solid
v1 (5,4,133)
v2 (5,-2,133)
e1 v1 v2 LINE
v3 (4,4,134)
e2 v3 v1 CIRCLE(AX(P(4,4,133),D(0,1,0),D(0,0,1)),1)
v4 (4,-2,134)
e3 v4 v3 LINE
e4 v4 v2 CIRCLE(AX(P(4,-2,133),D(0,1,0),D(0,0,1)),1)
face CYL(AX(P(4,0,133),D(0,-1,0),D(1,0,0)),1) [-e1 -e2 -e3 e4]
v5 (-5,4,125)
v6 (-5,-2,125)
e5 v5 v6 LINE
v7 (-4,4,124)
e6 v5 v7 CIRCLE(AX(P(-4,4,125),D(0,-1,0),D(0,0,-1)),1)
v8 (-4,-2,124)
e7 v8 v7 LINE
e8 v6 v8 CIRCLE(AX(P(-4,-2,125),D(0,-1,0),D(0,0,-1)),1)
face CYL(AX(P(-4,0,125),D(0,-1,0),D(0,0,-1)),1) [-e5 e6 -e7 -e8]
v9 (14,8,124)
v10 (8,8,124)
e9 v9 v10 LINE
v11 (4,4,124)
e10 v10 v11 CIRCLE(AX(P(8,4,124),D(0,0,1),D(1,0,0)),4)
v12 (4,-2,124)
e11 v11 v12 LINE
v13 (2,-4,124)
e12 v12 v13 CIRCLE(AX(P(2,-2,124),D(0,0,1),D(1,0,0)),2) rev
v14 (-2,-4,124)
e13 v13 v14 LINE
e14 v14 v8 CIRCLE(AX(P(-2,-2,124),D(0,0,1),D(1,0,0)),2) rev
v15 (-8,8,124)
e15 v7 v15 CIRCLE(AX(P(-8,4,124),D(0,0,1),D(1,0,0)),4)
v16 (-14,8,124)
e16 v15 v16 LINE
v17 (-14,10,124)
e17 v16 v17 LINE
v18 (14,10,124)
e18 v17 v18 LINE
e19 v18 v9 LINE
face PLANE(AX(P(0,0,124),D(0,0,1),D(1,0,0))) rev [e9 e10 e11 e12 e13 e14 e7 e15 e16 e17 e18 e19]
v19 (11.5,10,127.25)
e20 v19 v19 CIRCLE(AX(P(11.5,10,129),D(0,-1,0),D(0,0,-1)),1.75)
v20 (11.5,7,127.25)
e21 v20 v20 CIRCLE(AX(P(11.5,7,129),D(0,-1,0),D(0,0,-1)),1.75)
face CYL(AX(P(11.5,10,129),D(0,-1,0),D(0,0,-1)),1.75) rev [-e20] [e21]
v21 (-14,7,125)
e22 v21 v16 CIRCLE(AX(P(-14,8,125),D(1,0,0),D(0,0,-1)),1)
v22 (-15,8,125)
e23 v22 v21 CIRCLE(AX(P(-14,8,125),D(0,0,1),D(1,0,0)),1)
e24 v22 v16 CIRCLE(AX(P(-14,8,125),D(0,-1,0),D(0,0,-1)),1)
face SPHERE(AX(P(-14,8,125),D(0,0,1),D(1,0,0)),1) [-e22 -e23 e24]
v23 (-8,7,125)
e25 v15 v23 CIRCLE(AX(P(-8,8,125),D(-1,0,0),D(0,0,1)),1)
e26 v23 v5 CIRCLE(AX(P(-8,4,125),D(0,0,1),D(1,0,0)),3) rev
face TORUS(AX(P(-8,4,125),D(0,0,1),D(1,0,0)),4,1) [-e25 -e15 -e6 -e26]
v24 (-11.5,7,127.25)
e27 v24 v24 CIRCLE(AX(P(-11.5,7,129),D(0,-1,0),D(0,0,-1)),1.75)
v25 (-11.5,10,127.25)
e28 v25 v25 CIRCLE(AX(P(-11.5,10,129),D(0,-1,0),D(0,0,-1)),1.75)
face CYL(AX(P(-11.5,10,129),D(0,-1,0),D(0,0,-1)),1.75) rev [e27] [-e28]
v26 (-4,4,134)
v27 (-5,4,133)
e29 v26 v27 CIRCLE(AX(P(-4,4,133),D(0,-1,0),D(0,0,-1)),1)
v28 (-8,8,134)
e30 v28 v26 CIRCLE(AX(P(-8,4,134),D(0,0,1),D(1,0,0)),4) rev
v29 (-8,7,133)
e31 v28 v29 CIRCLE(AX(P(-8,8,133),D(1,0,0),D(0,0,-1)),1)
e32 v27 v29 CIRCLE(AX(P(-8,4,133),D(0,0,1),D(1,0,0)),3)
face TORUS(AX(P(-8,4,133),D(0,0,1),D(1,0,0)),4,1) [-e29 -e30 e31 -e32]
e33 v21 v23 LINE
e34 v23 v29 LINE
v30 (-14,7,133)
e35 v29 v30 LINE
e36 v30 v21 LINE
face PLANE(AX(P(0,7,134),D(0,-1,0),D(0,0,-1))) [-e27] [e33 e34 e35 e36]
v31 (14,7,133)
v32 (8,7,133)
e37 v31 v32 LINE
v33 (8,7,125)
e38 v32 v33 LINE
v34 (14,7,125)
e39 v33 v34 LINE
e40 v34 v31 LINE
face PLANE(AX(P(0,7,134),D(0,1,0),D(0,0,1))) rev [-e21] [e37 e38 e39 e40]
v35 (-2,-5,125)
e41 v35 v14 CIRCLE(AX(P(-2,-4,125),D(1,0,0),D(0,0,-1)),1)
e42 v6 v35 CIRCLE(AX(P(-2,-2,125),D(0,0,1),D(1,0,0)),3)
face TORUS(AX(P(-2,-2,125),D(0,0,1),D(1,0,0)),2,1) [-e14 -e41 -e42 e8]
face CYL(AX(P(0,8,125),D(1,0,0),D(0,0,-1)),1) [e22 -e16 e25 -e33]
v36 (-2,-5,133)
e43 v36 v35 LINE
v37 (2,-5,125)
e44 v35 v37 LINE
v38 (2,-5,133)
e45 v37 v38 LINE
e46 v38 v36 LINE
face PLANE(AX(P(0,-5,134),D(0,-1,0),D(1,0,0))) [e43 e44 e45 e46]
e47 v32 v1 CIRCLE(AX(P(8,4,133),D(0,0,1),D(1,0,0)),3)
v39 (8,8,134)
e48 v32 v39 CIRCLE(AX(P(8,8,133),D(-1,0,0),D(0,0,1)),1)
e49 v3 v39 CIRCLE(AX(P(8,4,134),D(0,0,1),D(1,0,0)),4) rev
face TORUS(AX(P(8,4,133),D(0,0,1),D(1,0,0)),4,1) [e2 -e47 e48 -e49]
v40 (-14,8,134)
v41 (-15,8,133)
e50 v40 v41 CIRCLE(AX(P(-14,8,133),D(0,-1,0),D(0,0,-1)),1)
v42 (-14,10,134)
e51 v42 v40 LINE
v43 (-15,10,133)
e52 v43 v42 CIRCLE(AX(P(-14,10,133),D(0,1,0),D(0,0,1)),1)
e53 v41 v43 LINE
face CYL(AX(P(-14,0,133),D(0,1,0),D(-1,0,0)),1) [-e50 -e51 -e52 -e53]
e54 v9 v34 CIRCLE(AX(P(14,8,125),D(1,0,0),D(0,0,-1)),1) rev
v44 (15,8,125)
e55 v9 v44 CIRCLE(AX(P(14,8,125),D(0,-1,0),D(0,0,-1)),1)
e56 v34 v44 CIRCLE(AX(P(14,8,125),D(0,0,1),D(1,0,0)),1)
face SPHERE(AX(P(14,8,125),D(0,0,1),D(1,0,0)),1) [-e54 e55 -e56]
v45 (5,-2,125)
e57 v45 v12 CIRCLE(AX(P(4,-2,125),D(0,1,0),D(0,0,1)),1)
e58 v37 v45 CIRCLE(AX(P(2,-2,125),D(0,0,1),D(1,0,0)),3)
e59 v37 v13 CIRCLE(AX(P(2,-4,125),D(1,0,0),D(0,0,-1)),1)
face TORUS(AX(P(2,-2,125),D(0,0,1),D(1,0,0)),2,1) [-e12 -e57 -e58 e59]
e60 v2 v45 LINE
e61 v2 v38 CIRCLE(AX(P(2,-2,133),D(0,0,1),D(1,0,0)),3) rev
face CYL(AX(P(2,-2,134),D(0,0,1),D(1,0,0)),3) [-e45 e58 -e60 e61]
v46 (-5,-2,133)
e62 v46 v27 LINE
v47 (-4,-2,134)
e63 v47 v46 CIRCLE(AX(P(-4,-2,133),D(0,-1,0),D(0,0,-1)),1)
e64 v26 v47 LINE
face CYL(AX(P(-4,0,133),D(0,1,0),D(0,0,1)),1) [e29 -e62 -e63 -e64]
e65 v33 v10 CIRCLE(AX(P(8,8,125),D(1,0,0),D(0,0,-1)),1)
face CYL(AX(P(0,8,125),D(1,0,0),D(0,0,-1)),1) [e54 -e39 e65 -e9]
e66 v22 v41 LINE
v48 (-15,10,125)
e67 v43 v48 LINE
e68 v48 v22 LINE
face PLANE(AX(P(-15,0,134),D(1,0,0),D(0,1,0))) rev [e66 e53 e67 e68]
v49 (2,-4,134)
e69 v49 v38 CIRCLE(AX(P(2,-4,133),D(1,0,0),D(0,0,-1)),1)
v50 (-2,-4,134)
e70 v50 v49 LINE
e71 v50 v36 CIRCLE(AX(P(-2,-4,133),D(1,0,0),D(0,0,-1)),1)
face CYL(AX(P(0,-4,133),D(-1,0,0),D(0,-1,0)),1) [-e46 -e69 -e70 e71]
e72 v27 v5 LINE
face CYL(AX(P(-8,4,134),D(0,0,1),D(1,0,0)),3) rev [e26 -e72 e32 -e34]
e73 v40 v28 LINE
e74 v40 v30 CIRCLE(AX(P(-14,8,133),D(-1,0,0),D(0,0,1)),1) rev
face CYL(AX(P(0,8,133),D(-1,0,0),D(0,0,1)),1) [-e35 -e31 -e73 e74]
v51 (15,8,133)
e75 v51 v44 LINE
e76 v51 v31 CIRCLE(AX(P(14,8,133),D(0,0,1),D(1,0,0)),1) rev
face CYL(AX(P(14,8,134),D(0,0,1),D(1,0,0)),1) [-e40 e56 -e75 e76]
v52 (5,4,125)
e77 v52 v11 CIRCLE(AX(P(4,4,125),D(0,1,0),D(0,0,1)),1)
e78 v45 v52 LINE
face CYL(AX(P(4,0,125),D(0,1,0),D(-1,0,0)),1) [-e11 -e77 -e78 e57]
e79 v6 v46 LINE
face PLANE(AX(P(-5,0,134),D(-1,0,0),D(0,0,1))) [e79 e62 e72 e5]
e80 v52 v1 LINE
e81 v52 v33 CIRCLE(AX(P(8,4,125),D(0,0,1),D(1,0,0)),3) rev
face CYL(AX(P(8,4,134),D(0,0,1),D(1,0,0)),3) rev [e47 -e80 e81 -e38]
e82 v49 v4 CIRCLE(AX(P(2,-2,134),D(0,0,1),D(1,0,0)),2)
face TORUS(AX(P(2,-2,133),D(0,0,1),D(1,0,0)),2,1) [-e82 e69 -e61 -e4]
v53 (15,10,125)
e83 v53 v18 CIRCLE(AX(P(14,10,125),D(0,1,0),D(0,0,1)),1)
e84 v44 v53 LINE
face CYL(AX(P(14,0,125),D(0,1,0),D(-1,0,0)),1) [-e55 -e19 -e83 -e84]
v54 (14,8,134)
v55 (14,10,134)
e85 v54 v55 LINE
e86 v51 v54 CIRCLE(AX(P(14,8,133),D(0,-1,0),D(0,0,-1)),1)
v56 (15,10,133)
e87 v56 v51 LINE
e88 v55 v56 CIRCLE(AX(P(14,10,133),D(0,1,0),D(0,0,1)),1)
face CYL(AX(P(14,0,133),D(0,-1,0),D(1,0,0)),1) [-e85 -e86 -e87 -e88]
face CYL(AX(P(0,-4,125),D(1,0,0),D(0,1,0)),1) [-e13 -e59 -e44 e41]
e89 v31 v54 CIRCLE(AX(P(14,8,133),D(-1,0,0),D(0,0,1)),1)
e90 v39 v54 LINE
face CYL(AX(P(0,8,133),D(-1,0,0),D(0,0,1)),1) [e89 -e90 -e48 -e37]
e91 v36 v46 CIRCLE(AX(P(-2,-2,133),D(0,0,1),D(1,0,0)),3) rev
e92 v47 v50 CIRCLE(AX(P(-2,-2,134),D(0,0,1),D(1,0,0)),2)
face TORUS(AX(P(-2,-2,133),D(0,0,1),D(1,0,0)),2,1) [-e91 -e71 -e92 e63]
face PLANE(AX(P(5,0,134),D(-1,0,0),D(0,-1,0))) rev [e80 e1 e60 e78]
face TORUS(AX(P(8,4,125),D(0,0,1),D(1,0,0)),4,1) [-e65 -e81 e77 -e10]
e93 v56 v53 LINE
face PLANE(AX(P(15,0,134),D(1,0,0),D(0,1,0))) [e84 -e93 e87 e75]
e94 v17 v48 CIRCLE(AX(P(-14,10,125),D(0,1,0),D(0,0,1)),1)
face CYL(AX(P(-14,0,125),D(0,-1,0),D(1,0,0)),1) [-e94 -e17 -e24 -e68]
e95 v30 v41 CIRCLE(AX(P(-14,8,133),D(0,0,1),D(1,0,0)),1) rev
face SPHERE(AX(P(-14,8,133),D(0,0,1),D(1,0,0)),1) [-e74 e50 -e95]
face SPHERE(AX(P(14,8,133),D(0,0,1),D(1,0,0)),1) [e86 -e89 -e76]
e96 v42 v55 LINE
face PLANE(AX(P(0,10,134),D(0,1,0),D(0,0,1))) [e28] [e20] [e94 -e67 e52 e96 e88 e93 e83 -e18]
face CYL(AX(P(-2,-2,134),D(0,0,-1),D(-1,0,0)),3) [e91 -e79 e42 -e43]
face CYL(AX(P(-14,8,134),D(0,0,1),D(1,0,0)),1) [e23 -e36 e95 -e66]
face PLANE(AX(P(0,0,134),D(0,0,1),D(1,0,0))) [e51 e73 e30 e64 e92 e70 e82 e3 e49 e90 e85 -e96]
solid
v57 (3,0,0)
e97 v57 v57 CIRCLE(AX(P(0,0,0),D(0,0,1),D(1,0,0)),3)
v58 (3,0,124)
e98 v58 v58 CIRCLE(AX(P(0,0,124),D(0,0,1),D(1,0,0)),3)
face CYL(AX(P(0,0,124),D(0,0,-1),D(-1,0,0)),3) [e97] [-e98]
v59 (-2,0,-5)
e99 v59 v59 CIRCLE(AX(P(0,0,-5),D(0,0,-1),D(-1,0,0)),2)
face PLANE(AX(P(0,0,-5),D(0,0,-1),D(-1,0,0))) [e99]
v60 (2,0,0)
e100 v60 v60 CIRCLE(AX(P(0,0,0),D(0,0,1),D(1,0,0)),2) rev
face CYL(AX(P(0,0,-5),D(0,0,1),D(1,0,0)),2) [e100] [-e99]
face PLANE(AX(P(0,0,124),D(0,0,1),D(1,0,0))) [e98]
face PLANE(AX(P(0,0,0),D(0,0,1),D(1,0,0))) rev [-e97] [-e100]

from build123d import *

# Parameters (mm, degrees)
SKETCH_1_R          = 3
EXTRUDE_1_DEPTH     = 124
SKETCH_2_R          = 2
EXTRUDE_2_DEPTH     = 5
SKETCH_4_W          = 10
SKETCH_4_H          = 3
EXTRUDE_4_DEPTH     = 10
FILLET_6_R          = 3
FILLET_7_R          = 1
SKETCH_5_R          = 1.75
CUT_EXTRUDE_1_DEPTH = 136.369863806
FILLET_8_R          = 1


with BuildPart() as part:
    # ｽｹｯﾁ1 → ﾎﾞｽ - 押し出し1 (new body)
    with BuildSketch(Plane.XY):
        Circle(SKETCH_1_R)
    extrude(amount=EXTRUDE_1_DEPTH)

    # ｽｹｯﾁ2 → ﾎﾞｽ - 押し出し2 (add)
    with BuildSketch(Plane(origin=(0, 0, 0), x_dir=(-1, 0, 0), z_dir=(0, 0, -1))):
        with Locations(Location((0, 0, 0), (0, 0, 180))):
            Circle(SKETCH_2_R)
    extrude(amount=EXTRUDE_2_DEPTH)


with BuildPart() as body_2:
    # ｽｹｯﾁ4 → ﾎﾞｽ - 押し出し4 (new body)
    with BuildSketch(Plane.XY.offset(124)):
        with Locations((10, 8.5)):
            Rectangle(SKETCH_4_W, SKETCH_4_H)
        with BuildLine():
            Line((5, 10), (0, 10))
            Line((0, 10), (0, 3))
            ThreePointArc((0, 3), (2.121320344, 2.121320344), (3, 0))
            ThreePointArc((3, 0), (2.121320344, -2.121320344), (0, -3))
            Line((0, -3), (0, -5))
            Line((0, -5), (5, -5))
            Line((5, -5), (5, 7))
            Line((5, 7), (5, 10))
        make_face()
        with BuildLine():
            Line((0, 3), (0, 10))
            Line((0, 10), (-5, 10))
            Line((-5, 10), (-5, 7))
            Line((-5, 7), (-5, -5))
            Line((-5, -5), (0, -5))
            Line((0, -5), (0, -3))
            ThreePointArc((0, -3), (-3, 0), (0, 3))
        make_face()
        with Locations((-10, 8.5)):
            Rectangle(SKETCH_4_W, SKETCH_4_H)
        with BuildLine():
            ThreePointArc((3, 0), (2.121320344, 2.121320344), (0, 3))
            Line((0, 3), (0, -3))
            ThreePointArc((0, -3), (2.121320344, -2.121320344), (3, 0))
        make_face()
        with BuildLine():
            Line((0, -3), (0, 3))
            ThreePointArc((0, 3), (-3, 0), (0, -3))
        make_face()
    extrude(amount=EXTRUDE_4_DEPTH)

    # ﾌｨﾚｯﾄ6
    fillet_6_edges = [body_2.edges().sort_by_distance(p)[0] for p in [
        (5, 7, 129),
        (5, -5, 129),
        (-5, -5, 129),
        (-5, 7, 129),
    ]]
    fillet(fillet_6_edges, radius=FILLET_6_R)

    # ﾌｨﾚｯﾄ7
    fillet_7_edges = [body_2.edges().sort_by_distance(p)[0] for p in [
        (15, 7, 129),
        (-15, 7, 129),
        (11.5, 7, 124),
        (11.5, 7, 134),
        (5, 1, 124),
        (5, 1, 134),
        (-5, 1, 124),
        (-5, 1, 134),
        (-11.5, 7, 124),
        (-11.5, 7, 134),
        (0, -5, 124),
        (-4.121320344, -4.121320344, 124),
        (4.121320344, -4.121320344, 124),
        (0, -5, 134),
        (-4.121320344, -4.121320344, 134),
        (4.121320344, -4.121320344, 134),
        (5.878679656, 6.121320344, 124),
        (5.878679656, 6.121320344, 134),
        (-5.878679656, 6.121320344, 124),
        (-5.878679656, 6.121320344, 134),
    ]]
    fillet(fillet_7_edges, radius=FILLET_7_R)

    # ｽｹｯﾁ5 → ｶｯﾄ - 押し出し1 (cut, through all)
    with BuildSketch(Plane(origin=(0, 7, 0), x_dir=(-1, 0, 0), z_dir=(0, -1, 0))):
        with Locations(Location((-11.5, -129, 0), (0, 0, 90))):
            Circle(SKETCH_5_R)
        with Locations(Location((11.5, -129, 0), (0, 0, 90))):
            Circle(SKETCH_5_R)
    extrude(amount=-CUT_EXTRUDE_1_DEPTH, mode=Mode.SUBTRACT)

    # ﾌｨﾚｯﾄ8
    # the kernel refuses this fillet: 1 mm, written as the material it takes off along each edge
    with BuildSketch(Plane(origin=(14, 8, 125), x_dir=(1, 0, 0), z_dir=(0, 0, -1))) as fillet_8_piece_1_section:
        Polygon((0, 0), (FILLET_8_R, 0), (FILLET_8_R, FILLET_8_R), (0, FILLET_8_R), align=None)
    fillet_8_piece_1 = extrude(amount=FILLET_8_R, mode=Mode.PRIVATE)
    fillet_8_piece_1 = fillet_8_piece_1 - Plane(origin=(14, 8, 125), x_dir=(-0.7071067811865472, 0.7071067811865477, 0), z_dir=(0, 0, -1)) * Sphere(FILLET_8_R, mode=Mode.PRIVATE)
    add(fillet_8_piece_1, mode=Mode.SUBTRACT)
    with BuildSketch(Plane(origin=(14, 8, 133), x_dir=(1, 0, 0), z_dir=(0, 0, 1))) as fillet_8_piece_2_section:
        Polygon((0, 0), (FILLET_8_R, 0), (FILLET_8_R, -FILLET_8_R), (0, -FILLET_8_R), align=None)
    fillet_8_piece_2 = extrude(amount=FILLET_8_R, mode=Mode.PRIVATE)
    fillet_8_piece_2 = fillet_8_piece_2 - Plane(origin=(14, 8, 133), x_dir=(-0.7071067811865472, 0.7071067811865477, 0), z_dir=(0, 0, 1)) * Sphere(FILLET_8_R, mode=Mode.PRIVATE)
    add(fillet_8_piece_2, mode=Mode.SUBTRACT)
    with BuildSketch(Plane(origin=(-14, 8, 125), x_dir=(-1, 0, 0), z_dir=(0, 0, -1))) as fillet_8_piece_3_section:
        Polygon((0, 0), (FILLET_8_R, 0), (FILLET_8_R, -FILLET_8_R), (0, -FILLET_8_R), align=None)
    fillet_8_piece_3 = extrude(amount=FILLET_8_R, mode=Mode.PRIVATE)
    fillet_8_piece_3 = fillet_8_piece_3 - Plane(origin=(-14, 8, 125), x_dir=(0.7071067811865472, 0.7071067811865477, 0), z_dir=(0, 0, -1)) * Sphere(FILLET_8_R, mode=Mode.PRIVATE)
    add(fillet_8_piece_3, mode=Mode.SUBTRACT)
    with BuildSketch(Plane(origin=(-14, 8, 133), x_dir=(-1, 0, 0), z_dir=(0, 0, 1))) as fillet_8_piece_4_section:
        Polygon((0, 0), (FILLET_8_R, 0), (FILLET_8_R, FILLET_8_R), (0, FILLET_8_R), align=None)
    fillet_8_piece_4 = extrude(amount=FILLET_8_R, mode=Mode.PRIVATE)
    fillet_8_piece_4 = fillet_8_piece_4 - Plane(origin=(-14, 8, 133), x_dir=(0.7071067811865472, 0.7071067811865477, 0), z_dir=(0, 0, 1)) * Sphere(FILLET_8_R, mode=Mode.PRIVATE)
    add(fillet_8_piece_4, mode=Mode.SUBTRACT)
    with BuildSketch(Plane(origin=(-15, 12.5, 124), x_dir=(1, 0, 0), z_dir=(0, -1, 0)), Plane(origin=(15, 8, 124), x_dir=(-1, 0, 0), z_dir=(0, 1, 0))) as fillet_8_piece_5:
        with BuildLine():
            CenterArc((FILLET_8_R, FILLET_8_R), FILLET_8_R, 180, 90)
            Line((0, FILLET_8_R), (0, 0))
            Line((0, 0), (FILLET_8_R, 0))
        make_face()
    extrude(amount=4.5, mode=Mode.SUBTRACT)
    with BuildSketch(Plane(origin=(-15, 12.5, 134), x_dir=(1, 0, 0), z_dir=(0, -1, 0)), Plane(origin=(15, 8, 134), x_dir=(-1, 0, 0), z_dir=(0, 1, 0))) as fillet_8_piece_6:
        with BuildLine():
            CenterArc((FILLET_8_R, -FILLET_8_R), FILLET_8_R, 90, 90)
            Line((0, -FILLET_8_R), (0, 0))
            Line((0, 0), (FILLET_8_R, 0))
        make_face()
    extrude(amount=4.5, mode=Mode.SUBTRACT)


solid = Compound([part.part, body_2.part])
